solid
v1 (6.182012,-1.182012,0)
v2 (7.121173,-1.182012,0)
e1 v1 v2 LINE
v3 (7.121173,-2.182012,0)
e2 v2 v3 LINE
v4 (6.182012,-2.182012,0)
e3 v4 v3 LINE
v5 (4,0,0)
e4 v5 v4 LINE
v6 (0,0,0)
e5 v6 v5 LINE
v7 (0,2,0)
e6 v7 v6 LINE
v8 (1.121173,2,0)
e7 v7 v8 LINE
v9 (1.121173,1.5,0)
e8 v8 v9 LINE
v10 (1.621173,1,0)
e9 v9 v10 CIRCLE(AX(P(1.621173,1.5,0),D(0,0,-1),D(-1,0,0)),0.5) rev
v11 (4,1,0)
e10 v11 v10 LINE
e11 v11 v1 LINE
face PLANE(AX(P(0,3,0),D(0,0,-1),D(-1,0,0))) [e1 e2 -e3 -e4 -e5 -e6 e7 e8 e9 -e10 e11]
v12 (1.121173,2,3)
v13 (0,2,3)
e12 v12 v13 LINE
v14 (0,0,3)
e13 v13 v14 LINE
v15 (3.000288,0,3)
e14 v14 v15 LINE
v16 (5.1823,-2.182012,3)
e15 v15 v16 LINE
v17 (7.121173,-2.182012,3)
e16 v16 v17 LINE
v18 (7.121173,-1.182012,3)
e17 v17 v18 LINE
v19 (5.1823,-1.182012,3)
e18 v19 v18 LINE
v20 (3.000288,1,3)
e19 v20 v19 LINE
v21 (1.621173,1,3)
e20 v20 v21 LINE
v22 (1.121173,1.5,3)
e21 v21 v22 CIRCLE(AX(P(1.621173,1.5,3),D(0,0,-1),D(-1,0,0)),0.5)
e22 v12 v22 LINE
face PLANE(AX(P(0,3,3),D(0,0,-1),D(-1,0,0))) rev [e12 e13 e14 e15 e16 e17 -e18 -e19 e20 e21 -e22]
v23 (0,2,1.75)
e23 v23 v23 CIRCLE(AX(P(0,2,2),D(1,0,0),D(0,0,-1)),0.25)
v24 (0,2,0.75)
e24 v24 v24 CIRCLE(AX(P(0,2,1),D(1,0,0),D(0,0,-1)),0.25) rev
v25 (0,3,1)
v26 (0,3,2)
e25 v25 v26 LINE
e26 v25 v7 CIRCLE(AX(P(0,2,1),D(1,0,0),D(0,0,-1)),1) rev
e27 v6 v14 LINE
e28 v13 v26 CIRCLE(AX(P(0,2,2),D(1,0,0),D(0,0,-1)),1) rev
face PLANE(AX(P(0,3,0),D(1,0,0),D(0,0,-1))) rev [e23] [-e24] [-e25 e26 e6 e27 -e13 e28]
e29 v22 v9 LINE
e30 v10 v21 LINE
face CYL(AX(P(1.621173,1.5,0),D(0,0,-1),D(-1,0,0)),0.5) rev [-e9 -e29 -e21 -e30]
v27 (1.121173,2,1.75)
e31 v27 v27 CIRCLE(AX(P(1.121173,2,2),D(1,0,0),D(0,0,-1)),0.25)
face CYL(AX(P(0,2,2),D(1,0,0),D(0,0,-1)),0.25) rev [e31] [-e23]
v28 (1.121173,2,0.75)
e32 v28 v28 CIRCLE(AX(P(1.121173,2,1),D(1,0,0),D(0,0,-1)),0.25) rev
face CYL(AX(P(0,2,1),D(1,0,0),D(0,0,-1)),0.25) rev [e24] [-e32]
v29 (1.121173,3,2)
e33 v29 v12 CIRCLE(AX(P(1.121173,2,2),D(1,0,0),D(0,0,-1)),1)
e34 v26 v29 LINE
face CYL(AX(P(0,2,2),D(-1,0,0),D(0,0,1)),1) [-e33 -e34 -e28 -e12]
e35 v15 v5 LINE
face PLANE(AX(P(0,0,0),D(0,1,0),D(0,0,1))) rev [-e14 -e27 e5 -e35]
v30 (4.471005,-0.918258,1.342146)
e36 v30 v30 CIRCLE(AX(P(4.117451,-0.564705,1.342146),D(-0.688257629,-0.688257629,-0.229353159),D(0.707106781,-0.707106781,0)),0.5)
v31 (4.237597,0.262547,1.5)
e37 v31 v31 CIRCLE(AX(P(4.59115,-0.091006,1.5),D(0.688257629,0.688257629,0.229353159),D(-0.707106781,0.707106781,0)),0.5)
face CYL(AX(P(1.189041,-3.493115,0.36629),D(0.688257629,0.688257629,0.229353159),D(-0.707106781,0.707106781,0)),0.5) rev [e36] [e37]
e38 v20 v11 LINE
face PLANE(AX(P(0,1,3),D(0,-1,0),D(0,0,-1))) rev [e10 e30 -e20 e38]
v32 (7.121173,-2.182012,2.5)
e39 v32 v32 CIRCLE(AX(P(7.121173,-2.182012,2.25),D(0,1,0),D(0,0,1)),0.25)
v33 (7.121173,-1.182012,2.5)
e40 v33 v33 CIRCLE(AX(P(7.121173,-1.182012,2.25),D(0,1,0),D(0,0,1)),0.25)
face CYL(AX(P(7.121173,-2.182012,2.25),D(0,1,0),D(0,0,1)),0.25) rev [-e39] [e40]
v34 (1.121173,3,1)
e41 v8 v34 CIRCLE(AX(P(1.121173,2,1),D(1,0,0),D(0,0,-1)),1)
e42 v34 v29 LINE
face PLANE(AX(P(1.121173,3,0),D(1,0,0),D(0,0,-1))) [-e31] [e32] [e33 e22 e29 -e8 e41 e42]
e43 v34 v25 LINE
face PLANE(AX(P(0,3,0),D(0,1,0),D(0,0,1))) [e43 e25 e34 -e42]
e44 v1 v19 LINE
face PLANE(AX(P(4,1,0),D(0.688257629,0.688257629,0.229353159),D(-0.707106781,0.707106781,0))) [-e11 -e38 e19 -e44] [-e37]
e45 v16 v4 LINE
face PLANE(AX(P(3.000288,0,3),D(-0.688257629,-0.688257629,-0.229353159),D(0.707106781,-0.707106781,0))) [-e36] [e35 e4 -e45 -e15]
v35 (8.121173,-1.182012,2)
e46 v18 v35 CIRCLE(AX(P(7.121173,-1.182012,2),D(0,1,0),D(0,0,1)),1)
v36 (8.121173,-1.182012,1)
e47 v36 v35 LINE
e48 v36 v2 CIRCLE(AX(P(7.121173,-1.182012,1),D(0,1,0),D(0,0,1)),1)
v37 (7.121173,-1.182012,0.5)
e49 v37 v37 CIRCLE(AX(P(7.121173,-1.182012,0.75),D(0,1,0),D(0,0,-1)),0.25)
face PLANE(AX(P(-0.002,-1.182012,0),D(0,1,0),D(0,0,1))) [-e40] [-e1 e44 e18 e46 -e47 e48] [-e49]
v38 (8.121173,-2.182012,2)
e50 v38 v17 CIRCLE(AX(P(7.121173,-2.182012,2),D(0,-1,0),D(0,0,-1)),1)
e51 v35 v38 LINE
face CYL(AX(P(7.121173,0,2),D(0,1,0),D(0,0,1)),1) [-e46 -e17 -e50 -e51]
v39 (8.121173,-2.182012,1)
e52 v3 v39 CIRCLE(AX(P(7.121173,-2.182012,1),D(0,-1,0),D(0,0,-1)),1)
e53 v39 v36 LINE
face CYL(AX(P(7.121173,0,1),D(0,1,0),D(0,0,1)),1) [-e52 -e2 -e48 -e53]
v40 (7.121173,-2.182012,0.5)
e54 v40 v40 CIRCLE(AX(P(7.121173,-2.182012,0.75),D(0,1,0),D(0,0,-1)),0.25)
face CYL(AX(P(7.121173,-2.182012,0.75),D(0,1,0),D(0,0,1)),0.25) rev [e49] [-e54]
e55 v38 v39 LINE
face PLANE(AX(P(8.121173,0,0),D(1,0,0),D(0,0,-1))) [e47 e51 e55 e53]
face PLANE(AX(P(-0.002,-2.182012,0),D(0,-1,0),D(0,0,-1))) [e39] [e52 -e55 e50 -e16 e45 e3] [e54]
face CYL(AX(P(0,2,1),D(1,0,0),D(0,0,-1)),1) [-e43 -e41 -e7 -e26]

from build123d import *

# Parameters (mm, degrees)
SKETCH3_W               = 1.121172813
SKETCH3_H               = 3
BOSS_EXTRUDE1_DEPTH     = 3
SKETCH4_W               = 4
SKETCH4_H               = 1
BOSS_EXTRUDE2_DEPTH     = 3
FILLET3_R               = 1
CUT_EXTRUDE4_DEPTH      = 6.127147937
CUT_EXTRUDE4_DEPTH_BACK = 6.127147937
CUT_EXTRUDE5_DEPTH      = 6.830951895
BOSS_EXTRUDE4_REACH     = 11.163
SKETCH26_W              = 3
SKETCH26_H              = 1
FILLET6_R               = 1
SKETCH27_R              = 0.25
CUT_EXTRUDE6_DEPTH      = 10.614711327
CUT_EXTRUDE7_DEPTH      = 8.660792968
CUT_EXTRUDE7_DEPTH_BACK = 8.660792968
SKETCH28_R              = 0.5
FILLET7_R               = 0.5


with BuildPart() as part:
    # Sketch3 → Boss-Extrude1 (new body)
    with BuildSketch(Plane(origin=(0, 0, 0), x_dir=(1, 0, 0), z_dir=(0, 1, 0))):
        with Locations((0.560586407, -1.5)):
            Rectangle(SKETCH3_W, SKETCH3_H)
    extrude(amount=BOSS_EXTRUDE1_DEPTH)

    # Sketch4 → Boss-Extrude2 (add)
    with BuildSketch(Plane.XY):
        with Locations((2, 0.5)):
            Rectangle(SKETCH4_W, SKETCH4_H)
    extrude(amount=BOSS_EXTRUDE2_DEPTH)

    # Fillet3
    fillet3_edges = [part.edges().sort_by_distance(p)[0] for p in [
        (0.560586407, 3, 0),
        (0.560586407, 3, 3),
    ]]
    fillet(fillet3_edges, radius=FILLET3_R)

    # Sketch5 → Cut-Extrude4 (cut, two sides: drawn at the far end of the back side and taken through both)
    with BuildSketch(Plane(origin=(1.121172813, 0, 0), x_dir=(0, 0, -1), z_dir=(1, 0, 0)).offset(-CUT_EXTRUDE4_DEPTH_BACK)):
        with BuildLine():
            ThreePointArc((-1.75, 2), (-2, 2.25), (-2.25, 2))
            Line((-2.25, 2), (-1.75, 2))
        make_face()
        with BuildLine():
            Line((-1.75, 2), (-2.25, 2))
            ThreePointArc((-2.25, 2), (-2, 1.75), (-1.75, 2))
        make_face()
        with BuildLine():
            ThreePointArc((-0.75, 2), (-1, 2.25), (-1.25, 2))
            Line((-1.25, 2), (-0.75, 2))
        make_face()
        with BuildLine():
            Line((-0.75, 2), (-1.25, 2))
            ThreePointArc((-1.25, 2), (-1, 1.75), (-0.75, 2))
        make_face()
    extrude(amount=CUT_EXTRUDE4_DEPTH + CUT_EXTRUDE4_DEPTH_BACK, mode=Mode.SUBTRACT)

    # Sketch12 → Cut-Extrude5 (cut, through all)
    with BuildSketch(Plane.XZ):
        Polygon((4, 0), (3.000287903, 3), (4, 3), align=None)
    extrude(amount=-CUT_EXTRUDE5_DEPTH, mode=Mode.SUBTRACT)

    # Sweep1: read off the stored shape, not the designer's step
    # Sweep1: loft between two sections, ruled curve by curve
    sweep1_from = [
        Edge.make_line((5.182299836, -1.182011934, 3), (5.182299836, -2.182011934, 3)),
        Edge.make_line((3.000287903, 1, 3), (5.182299836, -1.182011934, 3)),
        Edge.make_line((5.182299836, -2.182011934, 3), (3.000287903, 0, 3)),
        Edge.make_line((3.000287903, 0, 3), (3.000287903, 1, 3)),
    ]
    sweep1_to = [
        Edge.make_line((6.182011934, -1.182011934, 0), (6.182011934, -2.182011934, 0)),
        Edge.make_line((4, 1, 0), (6.182011934, -1.182011934, 0)),
        Edge.make_line((6.182011934, -2.182011934, 0), (4, 0, 0)),
        Edge.make_line((4, 0, 0), (4, 1, 0)),
    ]
    sweep1 = Solid(Shell([*[Face.make_surface_from_curves(sweep1_from[k], sweep1_to[k]) for k in range(4)], Face(Wire(sweep1_from)), Face(Wire(sweep1_to))]))
    add(sweep1)

    # Sketch26 → Boss-Extrude4 (add, up to next)
    with BuildSketch(Plane(origin=(8.121172813, 0, 0), x_dir=(0, 0, -1), z_dir=(1, 0, 0)), mode=Mode.PRIVATE) as boss_extrude4_sk1:
        with Locations((-1.5, -1.682011934)):
            Rectangle(SKETCH26_W, SKETCH26_H)
    boss_extrude4_tool1 = extrude(boss_extrude4_sk1.sketch, amount=-BOSS_EXTRUDE4_REACH, mode=Mode.PRIVATE) - part.part
    add(boss_extrude4_tool1.solids().sort_by_distance((8.121173, -1.682012, 1.5))[0])

    # Fillet6
    fillet6_edges = [part.edges().sort_by_distance(p)[0] for p in [
        (8.121172813, -1.682011934, 0),
        (8.121172813, -1.682011934, 3),
    ]]
    fillet(fillet6_edges, radius=FILLET6_R)

    # Sketch27 → Cut-Extrude6 (cut, through all)
    with BuildSketch(Plane(origin=(0, -1.182011934, 0), x_dir=(1, 0, 0), z_dir=(0, 1, 0))):
        with Locations(Location((7.121172813, -2.25, 0), (0, 0, 270))):
            Circle(SKETCH27_R)
        with Locations(Location((7.121172813, -0.75, 0), (0, 0, 90))):
            Circle(SKETCH27_R)
    extrude(amount=-CUT_EXTRUDE6_DEPTH, mode=Mode.SUBTRACT)

    # Sketch28 → Cut-Extrude7 (cut, two sides: drawn at the far end of the back side and taken through both)
    with BuildSketch(Plane(origin=(2.368492821, 2.368492821, 0.789270309), x_dir=(0.16217717426622844, 0.16217717426622855, -0.973343273616273), z_dir=(0.6882576291963799, 0.6882576291963798, 0.2293531593546452)).offset(-CUT_EXTRUDE7_DEPTH_BACK)):
        with Locations(Location((-0.730194281, -3.310784177, 0), (0, 0, 90))):
            Circle(SKETCH28_R)
    extrude(amount=CUT_EXTRUDE7_DEPTH + CUT_EXTRUDE7_DEPTH_BACK, mode=Mode.SUBTRACT)

    # Fillet7
    fillet7_edges = [part.edges().sort_by_distance(p)[0] for p in [
        (1.121172813, 1, 1.5),
    ]]
    fillet(fillet7_edges, radius=FILLET7_R)


solid = part.part
